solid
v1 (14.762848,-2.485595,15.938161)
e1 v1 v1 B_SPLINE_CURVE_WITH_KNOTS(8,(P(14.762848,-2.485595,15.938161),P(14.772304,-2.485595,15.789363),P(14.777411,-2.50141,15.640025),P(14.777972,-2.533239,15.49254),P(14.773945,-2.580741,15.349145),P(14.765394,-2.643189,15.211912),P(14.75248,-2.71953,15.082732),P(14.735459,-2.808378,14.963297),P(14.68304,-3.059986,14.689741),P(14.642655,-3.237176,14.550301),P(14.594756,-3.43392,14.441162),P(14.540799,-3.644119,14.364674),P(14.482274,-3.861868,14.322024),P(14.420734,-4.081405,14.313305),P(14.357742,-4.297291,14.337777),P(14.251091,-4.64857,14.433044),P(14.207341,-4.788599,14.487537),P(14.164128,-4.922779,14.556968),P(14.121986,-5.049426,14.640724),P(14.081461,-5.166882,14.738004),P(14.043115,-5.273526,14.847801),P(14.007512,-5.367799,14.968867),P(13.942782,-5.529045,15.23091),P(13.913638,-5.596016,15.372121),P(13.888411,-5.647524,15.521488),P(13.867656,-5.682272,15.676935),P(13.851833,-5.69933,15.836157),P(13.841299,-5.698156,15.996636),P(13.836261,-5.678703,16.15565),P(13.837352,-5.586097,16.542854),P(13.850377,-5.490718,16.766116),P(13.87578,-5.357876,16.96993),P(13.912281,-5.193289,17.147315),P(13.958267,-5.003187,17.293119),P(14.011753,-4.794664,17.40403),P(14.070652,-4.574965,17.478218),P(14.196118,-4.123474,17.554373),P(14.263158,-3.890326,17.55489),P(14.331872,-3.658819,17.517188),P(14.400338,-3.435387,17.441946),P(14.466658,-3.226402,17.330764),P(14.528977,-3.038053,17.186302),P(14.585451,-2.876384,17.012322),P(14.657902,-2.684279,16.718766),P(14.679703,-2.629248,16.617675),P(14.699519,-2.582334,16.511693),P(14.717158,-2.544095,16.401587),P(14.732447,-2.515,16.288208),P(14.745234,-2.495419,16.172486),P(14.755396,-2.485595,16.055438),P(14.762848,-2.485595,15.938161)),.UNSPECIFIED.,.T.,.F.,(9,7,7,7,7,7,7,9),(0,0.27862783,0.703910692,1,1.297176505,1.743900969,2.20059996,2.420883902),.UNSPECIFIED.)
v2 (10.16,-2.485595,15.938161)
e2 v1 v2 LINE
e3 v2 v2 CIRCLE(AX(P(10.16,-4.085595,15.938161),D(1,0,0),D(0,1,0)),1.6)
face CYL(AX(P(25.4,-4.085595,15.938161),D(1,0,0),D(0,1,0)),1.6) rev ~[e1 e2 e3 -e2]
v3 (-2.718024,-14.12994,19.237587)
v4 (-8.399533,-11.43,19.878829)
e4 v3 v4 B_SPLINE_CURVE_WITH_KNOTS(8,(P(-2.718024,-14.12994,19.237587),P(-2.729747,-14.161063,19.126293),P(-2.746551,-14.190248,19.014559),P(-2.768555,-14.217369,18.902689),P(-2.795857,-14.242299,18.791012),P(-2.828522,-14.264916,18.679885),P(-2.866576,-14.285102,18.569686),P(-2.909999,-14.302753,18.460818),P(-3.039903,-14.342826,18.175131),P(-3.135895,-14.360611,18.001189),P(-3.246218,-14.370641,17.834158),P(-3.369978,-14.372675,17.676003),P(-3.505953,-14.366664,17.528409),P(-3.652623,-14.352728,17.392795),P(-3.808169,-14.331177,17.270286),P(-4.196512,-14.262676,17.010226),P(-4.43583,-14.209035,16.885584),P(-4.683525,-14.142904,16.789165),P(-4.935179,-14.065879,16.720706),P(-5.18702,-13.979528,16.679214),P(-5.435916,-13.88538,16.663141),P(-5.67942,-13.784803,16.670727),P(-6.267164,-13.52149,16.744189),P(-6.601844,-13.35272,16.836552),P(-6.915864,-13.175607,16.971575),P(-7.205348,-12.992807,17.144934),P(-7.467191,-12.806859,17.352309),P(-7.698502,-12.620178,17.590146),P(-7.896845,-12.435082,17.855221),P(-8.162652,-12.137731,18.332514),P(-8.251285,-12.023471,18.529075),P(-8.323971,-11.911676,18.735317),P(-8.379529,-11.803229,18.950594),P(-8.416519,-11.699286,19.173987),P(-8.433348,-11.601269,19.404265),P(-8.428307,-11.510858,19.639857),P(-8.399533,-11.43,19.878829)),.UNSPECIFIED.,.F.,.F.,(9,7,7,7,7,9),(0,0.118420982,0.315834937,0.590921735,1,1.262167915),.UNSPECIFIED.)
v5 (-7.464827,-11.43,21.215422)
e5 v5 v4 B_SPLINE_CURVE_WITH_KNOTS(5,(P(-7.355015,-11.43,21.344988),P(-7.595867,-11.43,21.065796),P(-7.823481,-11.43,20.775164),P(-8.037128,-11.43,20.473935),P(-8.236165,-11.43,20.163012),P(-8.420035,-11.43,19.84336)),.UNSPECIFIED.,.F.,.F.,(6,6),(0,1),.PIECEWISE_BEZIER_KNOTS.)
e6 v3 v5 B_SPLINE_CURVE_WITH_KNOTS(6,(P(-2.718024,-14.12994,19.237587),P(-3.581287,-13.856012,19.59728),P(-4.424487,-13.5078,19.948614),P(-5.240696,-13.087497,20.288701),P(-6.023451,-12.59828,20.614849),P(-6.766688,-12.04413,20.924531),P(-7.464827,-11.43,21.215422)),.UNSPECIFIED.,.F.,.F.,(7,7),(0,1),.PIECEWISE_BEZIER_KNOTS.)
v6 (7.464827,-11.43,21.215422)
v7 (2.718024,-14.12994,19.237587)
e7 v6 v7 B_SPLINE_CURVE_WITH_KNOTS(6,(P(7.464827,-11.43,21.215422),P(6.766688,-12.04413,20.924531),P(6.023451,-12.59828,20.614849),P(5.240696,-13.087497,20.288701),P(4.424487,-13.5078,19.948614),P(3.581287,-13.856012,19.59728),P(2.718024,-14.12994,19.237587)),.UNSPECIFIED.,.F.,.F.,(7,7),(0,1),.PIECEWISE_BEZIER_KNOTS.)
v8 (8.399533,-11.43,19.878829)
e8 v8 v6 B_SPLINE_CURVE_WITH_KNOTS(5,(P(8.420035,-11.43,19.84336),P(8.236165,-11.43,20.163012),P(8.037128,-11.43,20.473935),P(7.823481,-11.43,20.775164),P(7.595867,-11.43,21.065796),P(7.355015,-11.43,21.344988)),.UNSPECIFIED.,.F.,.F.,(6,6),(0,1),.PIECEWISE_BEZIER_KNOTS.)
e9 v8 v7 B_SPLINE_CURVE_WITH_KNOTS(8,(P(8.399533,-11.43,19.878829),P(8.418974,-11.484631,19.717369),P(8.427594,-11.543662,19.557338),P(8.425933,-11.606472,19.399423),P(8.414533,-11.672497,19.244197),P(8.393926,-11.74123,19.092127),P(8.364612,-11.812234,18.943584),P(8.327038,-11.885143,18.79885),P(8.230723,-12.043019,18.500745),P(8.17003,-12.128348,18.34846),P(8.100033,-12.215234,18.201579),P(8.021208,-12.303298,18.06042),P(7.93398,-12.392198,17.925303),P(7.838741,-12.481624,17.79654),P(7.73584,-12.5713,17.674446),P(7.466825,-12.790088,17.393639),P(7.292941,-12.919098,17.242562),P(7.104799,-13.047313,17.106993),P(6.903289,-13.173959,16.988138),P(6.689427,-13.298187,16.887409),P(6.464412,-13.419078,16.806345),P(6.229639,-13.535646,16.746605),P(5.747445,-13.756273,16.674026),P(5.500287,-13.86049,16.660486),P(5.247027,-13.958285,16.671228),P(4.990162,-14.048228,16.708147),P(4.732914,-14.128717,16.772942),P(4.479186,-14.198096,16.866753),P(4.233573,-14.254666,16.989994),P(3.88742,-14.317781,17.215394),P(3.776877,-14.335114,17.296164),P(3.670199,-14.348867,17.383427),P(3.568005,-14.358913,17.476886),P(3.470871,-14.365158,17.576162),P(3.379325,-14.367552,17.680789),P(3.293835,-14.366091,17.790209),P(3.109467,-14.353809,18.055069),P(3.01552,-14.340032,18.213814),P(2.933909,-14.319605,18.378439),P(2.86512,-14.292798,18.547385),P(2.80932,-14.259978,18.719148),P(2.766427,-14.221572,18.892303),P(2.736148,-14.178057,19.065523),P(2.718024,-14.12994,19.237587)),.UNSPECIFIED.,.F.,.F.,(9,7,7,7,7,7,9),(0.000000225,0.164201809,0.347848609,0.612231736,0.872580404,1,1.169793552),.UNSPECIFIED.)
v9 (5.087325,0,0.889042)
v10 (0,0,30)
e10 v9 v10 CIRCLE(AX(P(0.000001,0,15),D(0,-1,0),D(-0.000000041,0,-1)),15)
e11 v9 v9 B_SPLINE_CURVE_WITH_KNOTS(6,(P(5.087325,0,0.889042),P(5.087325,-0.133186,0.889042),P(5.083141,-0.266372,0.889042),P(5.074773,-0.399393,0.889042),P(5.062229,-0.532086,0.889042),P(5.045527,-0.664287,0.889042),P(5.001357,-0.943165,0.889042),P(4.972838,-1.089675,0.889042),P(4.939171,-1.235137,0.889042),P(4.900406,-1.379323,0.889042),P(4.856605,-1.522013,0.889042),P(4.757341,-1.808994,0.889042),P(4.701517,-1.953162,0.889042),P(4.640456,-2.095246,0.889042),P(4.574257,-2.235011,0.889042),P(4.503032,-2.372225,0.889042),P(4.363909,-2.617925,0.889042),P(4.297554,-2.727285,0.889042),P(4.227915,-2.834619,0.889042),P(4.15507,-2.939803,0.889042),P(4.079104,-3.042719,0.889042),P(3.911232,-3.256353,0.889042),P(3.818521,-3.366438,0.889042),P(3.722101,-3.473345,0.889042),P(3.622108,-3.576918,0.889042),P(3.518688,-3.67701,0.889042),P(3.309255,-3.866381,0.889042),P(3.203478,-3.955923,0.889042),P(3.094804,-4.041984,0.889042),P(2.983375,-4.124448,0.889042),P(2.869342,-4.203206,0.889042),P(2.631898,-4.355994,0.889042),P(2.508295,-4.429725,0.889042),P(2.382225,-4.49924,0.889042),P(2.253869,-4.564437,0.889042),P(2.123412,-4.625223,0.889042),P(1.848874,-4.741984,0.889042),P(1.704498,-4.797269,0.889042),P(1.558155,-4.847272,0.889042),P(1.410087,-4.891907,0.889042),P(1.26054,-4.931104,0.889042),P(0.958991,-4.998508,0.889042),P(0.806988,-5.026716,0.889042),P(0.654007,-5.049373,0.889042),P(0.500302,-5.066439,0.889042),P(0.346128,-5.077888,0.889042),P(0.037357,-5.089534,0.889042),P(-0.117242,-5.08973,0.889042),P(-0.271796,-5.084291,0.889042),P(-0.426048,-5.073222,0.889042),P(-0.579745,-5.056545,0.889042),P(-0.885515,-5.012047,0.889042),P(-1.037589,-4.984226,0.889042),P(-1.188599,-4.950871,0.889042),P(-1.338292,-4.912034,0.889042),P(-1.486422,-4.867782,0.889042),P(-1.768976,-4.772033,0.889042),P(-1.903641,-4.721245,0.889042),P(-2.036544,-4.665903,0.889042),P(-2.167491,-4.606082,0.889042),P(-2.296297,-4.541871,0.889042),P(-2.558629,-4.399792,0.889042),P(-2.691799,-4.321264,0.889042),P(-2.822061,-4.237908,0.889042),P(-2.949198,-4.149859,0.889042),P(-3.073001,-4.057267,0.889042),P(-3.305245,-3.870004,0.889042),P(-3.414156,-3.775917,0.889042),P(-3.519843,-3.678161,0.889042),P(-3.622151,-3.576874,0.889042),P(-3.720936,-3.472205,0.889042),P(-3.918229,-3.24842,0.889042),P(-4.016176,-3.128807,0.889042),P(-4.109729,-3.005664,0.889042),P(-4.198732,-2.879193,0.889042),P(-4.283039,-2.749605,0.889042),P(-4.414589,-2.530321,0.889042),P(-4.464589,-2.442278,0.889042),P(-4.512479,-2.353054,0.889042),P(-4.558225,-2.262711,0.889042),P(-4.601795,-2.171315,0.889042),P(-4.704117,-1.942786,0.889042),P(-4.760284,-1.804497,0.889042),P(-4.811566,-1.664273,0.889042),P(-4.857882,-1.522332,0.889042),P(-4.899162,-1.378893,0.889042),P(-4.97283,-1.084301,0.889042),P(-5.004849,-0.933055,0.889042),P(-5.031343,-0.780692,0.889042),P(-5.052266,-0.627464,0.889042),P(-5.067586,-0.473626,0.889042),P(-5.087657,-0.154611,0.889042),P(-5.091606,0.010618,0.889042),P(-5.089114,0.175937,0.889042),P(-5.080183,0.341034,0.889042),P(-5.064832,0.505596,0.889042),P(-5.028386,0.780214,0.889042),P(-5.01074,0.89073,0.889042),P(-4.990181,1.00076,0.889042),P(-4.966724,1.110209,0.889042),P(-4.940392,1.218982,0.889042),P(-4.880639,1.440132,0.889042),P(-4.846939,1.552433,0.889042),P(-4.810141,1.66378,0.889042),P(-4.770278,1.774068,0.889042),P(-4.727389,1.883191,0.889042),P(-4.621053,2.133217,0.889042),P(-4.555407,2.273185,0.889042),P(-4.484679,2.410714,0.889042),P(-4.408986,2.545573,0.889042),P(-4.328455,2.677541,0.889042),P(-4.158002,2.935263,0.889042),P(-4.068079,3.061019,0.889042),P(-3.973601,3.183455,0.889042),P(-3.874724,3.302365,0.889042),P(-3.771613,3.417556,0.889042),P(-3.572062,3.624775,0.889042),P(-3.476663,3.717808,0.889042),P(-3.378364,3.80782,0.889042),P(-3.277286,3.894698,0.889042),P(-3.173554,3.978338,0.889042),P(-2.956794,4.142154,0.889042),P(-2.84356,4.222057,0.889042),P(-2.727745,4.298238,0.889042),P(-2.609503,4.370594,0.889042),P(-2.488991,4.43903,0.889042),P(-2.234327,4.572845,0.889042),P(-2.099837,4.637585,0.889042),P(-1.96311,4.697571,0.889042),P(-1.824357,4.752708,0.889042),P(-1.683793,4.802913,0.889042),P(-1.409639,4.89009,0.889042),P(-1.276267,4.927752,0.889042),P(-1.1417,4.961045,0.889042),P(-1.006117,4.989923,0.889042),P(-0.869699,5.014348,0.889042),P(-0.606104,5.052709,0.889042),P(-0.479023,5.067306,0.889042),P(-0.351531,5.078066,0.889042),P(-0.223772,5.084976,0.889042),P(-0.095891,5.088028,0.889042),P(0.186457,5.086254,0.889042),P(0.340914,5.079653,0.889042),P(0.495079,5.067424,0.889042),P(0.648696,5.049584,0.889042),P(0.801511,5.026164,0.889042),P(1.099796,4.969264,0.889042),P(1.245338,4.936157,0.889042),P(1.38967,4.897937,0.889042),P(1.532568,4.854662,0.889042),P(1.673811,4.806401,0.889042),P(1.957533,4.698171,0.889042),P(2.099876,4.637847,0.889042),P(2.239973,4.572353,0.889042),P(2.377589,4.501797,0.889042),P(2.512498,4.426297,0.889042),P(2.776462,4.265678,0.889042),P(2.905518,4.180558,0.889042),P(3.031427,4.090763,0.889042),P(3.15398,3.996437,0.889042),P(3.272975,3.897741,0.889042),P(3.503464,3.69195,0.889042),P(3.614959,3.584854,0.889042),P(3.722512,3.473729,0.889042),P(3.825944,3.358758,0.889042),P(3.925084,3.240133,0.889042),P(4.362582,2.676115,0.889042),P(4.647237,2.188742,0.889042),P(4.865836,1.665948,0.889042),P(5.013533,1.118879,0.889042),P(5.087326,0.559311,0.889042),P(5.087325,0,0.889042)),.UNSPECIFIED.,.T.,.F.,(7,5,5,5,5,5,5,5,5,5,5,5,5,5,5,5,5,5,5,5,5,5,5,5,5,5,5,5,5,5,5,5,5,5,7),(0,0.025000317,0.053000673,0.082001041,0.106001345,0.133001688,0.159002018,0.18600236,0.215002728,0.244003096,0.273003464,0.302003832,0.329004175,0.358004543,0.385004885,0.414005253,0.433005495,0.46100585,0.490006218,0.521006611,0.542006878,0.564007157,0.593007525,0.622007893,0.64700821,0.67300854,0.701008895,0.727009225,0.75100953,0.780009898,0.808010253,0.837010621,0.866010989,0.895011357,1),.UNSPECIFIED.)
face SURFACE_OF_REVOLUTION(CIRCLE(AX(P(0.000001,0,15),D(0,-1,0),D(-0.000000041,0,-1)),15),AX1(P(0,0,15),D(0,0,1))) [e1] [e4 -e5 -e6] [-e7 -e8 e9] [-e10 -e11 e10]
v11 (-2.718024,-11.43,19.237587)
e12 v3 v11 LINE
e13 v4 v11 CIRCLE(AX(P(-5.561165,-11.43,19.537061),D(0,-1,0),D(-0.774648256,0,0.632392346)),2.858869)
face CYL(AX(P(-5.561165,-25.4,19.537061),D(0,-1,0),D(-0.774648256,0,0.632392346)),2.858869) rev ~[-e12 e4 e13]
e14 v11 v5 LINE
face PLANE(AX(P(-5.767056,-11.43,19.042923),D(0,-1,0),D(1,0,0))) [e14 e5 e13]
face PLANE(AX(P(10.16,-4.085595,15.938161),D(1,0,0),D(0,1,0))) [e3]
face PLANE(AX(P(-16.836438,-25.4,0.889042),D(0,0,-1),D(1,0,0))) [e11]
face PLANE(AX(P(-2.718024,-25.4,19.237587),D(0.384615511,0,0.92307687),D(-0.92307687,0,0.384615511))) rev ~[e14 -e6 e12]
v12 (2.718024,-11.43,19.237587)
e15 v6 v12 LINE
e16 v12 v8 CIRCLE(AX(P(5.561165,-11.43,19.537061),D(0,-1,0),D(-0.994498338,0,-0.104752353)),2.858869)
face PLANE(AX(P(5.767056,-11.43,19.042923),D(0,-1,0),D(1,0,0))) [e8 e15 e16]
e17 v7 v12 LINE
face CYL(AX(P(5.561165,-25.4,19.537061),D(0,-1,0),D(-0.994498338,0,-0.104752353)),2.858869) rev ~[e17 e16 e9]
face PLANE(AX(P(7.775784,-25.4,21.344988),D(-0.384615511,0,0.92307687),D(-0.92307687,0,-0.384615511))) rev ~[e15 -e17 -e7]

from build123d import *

# Parameters (mm, degrees)
F5_DEPTH = 13.97
F6_R     = 1.6
F7_DEPTH = 15.24
F8_W     = 36.1250601709
F8_H     = 9.7824148252
F9_DEPTH = 76.2


# Not quite as in the source:
# - ends of sketch curves that miss each other by under 0.0002 mm in the source are joined


with BuildPart() as f1:
    # F0 (on Front) → F1 (revolve)
    with BuildSketch(Plane.XZ):
        with BuildLine():
            Line((0, 30), (0, 0))
            ThreePointArc((0, 0), (15.0000006192, 15), (0, 30))
        make_face()
    revolve(axis=Axis((0, 0, 15), (0, 0, 1)))

    # F4 (on offset) → F5 (cut)
    with BuildSketch(Plane.XZ.offset(25.4)):
        with BuildLine():
            ThreePointArc((-7.7757835388, 21.3449876755), (-6.6607308484, 16.8981042804), (-2.7180244215, 19.2375872284))
            Line((-2.7180244215, 19.2375872284), (-7.7757835388, 21.3449876755))
        make_face()
        with BuildLine():
            Line((7.7757835388, 21.3449876755), (2.7180244215, 19.2375872284))
            ThreePointArc((2.7180244215, 19.2375872284), (6.6607308484, 16.8981042804), (7.7757835388, 21.3449876755))
        make_face()
    extrude(amount=-F5_DEPTH, mode=Mode.SUBTRACT)

    # F6 (on offset) → F7 (cut)
    with BuildSketch(Plane.YZ.offset(25.4)):
        with Locations((-4.0855947882, 15.938160941)):
            Circle(F6_R)
    extrude(amount=-F7_DEPTH, mode=Mode.SUBTRACT)

    # F8 (on offset) → F9 (cut)
    with BuildSketch(Plane.XZ.offset(25.4)):
        with Locations((1.2260917574, -4.0021650784)):
            Rectangle(F8_W, F8_H)
    extrude(amount=-F9_DEPTH, mode=Mode.SUBTRACT)


solid = f1.part
